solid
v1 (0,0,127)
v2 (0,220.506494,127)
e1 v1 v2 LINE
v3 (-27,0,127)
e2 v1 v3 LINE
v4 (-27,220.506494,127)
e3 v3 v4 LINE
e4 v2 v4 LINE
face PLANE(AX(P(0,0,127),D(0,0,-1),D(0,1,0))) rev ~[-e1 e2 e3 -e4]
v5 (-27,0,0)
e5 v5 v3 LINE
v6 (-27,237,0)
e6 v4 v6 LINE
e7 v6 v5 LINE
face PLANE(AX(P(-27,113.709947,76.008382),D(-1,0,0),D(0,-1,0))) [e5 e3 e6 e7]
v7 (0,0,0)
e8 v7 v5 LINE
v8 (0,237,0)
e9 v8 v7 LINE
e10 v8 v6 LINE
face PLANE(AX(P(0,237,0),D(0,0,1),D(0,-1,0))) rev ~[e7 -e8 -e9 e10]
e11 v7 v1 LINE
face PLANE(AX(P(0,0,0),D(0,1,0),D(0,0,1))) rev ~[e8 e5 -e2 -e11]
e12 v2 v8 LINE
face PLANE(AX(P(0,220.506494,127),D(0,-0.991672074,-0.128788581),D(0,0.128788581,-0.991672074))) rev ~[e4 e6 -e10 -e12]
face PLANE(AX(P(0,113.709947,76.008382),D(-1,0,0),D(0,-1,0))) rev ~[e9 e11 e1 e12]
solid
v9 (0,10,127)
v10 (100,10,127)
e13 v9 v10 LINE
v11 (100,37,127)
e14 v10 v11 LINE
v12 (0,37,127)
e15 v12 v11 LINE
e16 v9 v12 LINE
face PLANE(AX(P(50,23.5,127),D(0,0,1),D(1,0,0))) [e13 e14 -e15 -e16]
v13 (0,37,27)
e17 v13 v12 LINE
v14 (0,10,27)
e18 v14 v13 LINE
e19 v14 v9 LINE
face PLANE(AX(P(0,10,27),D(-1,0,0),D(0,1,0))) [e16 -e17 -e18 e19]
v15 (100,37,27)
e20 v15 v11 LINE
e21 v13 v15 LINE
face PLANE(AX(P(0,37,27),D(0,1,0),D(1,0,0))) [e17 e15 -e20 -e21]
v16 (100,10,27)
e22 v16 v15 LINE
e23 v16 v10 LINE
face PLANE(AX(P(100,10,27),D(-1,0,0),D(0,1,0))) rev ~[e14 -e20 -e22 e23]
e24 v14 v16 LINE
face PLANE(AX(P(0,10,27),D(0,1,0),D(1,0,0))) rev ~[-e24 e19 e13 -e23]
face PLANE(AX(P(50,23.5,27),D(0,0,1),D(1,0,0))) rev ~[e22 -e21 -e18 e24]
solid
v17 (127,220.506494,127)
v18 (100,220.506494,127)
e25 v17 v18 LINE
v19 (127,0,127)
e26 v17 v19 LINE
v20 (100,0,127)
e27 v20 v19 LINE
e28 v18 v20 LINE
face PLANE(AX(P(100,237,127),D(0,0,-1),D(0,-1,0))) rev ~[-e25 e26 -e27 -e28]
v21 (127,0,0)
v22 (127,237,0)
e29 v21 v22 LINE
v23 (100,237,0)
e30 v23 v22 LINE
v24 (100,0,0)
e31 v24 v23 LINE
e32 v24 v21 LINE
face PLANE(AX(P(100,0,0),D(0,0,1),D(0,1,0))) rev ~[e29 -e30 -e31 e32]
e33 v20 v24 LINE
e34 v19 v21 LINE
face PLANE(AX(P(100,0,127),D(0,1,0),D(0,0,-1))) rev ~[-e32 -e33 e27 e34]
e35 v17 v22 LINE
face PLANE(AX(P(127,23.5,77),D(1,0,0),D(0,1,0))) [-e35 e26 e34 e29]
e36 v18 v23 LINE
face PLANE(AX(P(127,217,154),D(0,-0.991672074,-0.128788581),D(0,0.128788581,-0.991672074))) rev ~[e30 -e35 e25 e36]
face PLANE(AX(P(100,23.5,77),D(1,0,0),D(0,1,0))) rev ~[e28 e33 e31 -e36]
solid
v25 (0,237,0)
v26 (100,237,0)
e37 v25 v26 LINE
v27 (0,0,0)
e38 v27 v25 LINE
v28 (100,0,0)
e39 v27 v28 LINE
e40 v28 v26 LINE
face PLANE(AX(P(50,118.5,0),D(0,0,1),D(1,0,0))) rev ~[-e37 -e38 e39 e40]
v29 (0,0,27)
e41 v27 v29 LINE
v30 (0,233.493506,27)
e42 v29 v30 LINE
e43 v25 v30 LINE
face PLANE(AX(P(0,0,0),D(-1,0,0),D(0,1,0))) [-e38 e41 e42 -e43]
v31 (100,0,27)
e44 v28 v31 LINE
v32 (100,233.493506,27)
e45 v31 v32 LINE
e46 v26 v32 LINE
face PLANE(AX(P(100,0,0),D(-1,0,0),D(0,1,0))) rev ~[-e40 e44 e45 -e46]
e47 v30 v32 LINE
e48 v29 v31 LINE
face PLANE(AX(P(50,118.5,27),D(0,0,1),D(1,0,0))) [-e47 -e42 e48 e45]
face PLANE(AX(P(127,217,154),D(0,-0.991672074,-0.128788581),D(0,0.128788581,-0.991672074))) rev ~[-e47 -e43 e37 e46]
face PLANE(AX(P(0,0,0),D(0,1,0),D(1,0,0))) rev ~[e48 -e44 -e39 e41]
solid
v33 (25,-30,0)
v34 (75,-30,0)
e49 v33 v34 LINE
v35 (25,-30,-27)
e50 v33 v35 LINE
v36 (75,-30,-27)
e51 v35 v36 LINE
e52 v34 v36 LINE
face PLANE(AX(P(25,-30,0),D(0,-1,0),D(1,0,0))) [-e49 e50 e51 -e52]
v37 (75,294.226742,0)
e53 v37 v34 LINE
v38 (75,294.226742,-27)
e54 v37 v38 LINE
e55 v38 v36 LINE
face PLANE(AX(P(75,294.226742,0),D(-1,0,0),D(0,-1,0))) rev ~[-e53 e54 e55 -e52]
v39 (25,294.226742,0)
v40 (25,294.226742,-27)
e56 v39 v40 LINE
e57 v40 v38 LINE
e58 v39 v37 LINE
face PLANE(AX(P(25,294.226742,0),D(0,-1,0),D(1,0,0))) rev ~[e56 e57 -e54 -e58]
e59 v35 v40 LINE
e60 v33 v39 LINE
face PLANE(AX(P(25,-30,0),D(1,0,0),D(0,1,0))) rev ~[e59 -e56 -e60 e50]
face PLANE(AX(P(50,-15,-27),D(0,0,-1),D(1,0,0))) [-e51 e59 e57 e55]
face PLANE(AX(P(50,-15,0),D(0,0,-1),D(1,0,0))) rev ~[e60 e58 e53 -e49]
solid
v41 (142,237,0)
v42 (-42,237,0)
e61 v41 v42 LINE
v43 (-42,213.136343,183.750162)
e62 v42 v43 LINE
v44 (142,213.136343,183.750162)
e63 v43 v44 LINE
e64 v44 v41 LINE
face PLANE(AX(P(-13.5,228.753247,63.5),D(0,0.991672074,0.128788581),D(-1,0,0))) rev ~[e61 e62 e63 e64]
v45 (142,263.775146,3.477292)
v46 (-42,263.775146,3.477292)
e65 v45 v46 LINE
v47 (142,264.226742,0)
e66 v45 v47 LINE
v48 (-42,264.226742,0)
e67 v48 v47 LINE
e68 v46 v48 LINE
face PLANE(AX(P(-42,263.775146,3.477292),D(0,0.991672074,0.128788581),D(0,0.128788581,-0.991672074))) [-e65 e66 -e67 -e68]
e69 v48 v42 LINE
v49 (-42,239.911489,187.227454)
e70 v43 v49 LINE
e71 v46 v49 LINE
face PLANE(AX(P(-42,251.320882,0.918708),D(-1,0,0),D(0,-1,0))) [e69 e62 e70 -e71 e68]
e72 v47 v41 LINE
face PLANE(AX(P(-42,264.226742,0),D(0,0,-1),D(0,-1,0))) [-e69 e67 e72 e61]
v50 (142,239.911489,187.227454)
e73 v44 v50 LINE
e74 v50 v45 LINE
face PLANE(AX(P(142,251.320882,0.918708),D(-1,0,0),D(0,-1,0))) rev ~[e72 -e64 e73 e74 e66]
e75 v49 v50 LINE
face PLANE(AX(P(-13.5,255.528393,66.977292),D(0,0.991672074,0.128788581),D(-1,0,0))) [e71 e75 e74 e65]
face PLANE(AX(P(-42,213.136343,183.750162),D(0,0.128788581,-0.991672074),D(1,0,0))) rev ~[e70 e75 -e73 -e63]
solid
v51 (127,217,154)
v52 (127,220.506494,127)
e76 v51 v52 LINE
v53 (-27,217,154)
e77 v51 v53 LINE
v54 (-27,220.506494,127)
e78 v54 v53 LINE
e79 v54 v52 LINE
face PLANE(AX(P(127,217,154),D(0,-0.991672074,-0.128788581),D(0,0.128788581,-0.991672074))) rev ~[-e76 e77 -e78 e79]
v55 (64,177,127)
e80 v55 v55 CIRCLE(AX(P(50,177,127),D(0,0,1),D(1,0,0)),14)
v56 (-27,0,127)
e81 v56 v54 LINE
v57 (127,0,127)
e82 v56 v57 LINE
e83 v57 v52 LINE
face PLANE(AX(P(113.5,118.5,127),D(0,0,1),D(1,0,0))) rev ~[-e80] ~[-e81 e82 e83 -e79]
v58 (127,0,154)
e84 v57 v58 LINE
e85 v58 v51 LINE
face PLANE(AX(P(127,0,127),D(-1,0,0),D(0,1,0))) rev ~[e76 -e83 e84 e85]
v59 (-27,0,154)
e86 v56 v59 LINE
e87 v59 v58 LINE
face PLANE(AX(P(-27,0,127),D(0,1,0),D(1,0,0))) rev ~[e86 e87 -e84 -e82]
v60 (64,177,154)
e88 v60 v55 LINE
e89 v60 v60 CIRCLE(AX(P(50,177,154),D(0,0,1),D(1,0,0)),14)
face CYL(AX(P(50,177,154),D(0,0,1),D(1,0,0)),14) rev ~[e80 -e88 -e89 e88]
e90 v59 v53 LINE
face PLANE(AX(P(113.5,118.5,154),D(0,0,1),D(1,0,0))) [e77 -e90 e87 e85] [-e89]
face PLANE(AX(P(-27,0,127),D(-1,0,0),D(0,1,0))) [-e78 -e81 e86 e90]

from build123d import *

# Parameters (mm, degrees)
F0_W      = 100
F0_H      = 237
F1_DEPTH  = 27
F2_W      = 100
F2_H      = 27
F3_DEPTH  = 100
F4_W      = 27
F4_H      = 100
F4_W_2    = 200
F4_W_3    = 10
F5_DEPTH  = 27
F6_W      = 27
F6_H      = 237
F6_W_2    = 127
F7_DEPTH  = 27
F8_R      = 14
F9_DEPTH  = 27
F11_DEPTH = 154.001
F13_DEPTH = 27
F14_W     = 100
F14_H     = 27.2267423081
F14_H_2   = 100.8397863263
F15_DEPTH = 27
F17_DEPTH = 184
F18_W     = 50
F18_H     = 30
F18_H_2   = 237
F18_H_3   = 27.2267423081
F19_DEPTH = 27


with BuildPart() as f1:
    # F0 (on Top) → F1 (new body)
    with BuildSketch(Plane.XY):
        with Locations((50, 118.5)):
            Rectangle(F0_W, F0_H)
    extrude(amount=F1_DEPTH)


with BuildPart() as f3:
    # F2 (on face) → F3 (new body)
    with BuildSketch(Plane.XY.offset(27)):
        with Locations((50, 23.5)):
            Rectangle(F2_W, F2_H)
    extrude(amount=F3_DEPTH)


with BuildPart() as f5:
    # F4 (on face) → F5 (new body)
    with BuildSketch(Plane.YZ.offset(100)):
        with Locations((23.5, 77)):
            Rectangle(F4_W, F4_H)
        with Locations((137, 77)):
            Rectangle(F4_W_2, F4_H)
        Polygon((0, 27), (0, 0), (237, 0), (237, 27), (37, 27), (10, 27), align=None)
        with Locations((5, 77)):
            Rectangle(F4_W_3, F4_H)
    extrude(amount=F5_DEPTH)


with BuildPart() as f7:
    # F6 (on face) → F7 (new body)
    with BuildSketch(Plane.XY.offset(127)):
        with Locations((113.5, 118.5)):
            Rectangle(F6_W, F6_H)
        with Locations((36.5, 118.5)):
            Rectangle(F6_W_2, F6_H)
    extrude(amount=F7_DEPTH)

    # F8 (on face) → F9 (cut, through all)
    with BuildSketch(Plane.XY.offset(154)):
        with Locations((50, 177)):
            Circle(F8_R)
    extrude(amount=-F9_DEPTH, mode=Mode.SUBTRACT)


with BuildPart() as f11_tool:
    # F10 (on face) → F11 (new body, through all)
    with BuildSketch(Plane.YZ.offset(127)):
        Polygon((237, 127), (220.5064935065, 127), (237, 0), align=None)
        Polygon((217, 154), (220.5064935065, 127), (237, 127), (237, 154), align=None)
    extrude(amount=-F11_DEPTH)


with BuildPart() as f1_1:
    add(f1.part)

    # F11: cut by f11_tool
    add(f11_tool.part, mode=Mode.SUBTRACT)


with BuildPart() as f5_1:
    add(f5.part)

    # F11: cut by f11_tool
    add(f11_tool.part, mode=Mode.SUBTRACT)


with BuildPart() as f7_1:
    add(f7.part)

    # F11: cut by f11_tool
    add(f11_tool.part, mode=Mode.SUBTRACT)


with BuildPart() as f13:
    # F12 (on face) → F13 (new body)
    with BuildSketch(Plane(origin=(0, 0, 0), x_dir=(0, -1, 0), z_dir=(-1, 0, 0))):
        Polygon((0, 127), (-220.5064935065, 127), (-233.4935064935, 27), (0, 27), align=None)
        Polygon((0, 27), (-233.4935064935, 27), (-237, 0), (0, 0), align=None)
    extrude(amount=F13_DEPTH)


with BuildPart() as f15:
    # F14 (on face) → F15 (new body)
    with BuildSketch(Plane(origin=(0, 233.0689998341, 30.2687012772), x_dir=(-1, 0, 0), z_dir=(0, 0.9916720735, 0.128788581))):
        Polygon((27, -30.5228936916), (27, 97.5436349427), (0, 97.5436349427), (0, -3.2961513835), (0, -30.5228936916), align=None)
        Polygon((27, 124.7703772508), (27, 97.5436349427), (27, -30.5228936916), (42, -30.5228936916), (42, 154.7703772508), (-142, 154.7703772508), (-142, -30.5228936916), (-127, -30.5228936916), (-127, 97.5436349427), (-127, 124.7703772508), align=None)
        Polygon((-100, -3.2961513835), (-100, 97.5436349427), (-127, 97.5436349427), (-127, -30.5228936916), (-100, -30.5228936916), align=None)
        with Locations((-50, -16.9095225376)):
            Rectangle(F14_W, F14_H)
        Polygon((0, 97.5436349427), (27, 97.5436349427), (27, 124.7703772508), (-127, 124.7703772508), (-127, 97.5436349427), (-100, 97.5436349427), align=None)
        with Locations((-50, 47.1237417796)):
            Rectangle(F14_W, F14_H_2)
    extrude(amount=F15_DEPTH)

    # F16 (on face) → F17 (join, through all)
    with BuildSketch(Plane(origin=(-42, 0, 0), x_dir=(0, -1, 0), z_dir=(-1, 0, 0))):
        Polygon((-264.2267423081, 0), (-237, 0), (-263.7751459852, 3.4772916864), align=None)
    extrude(amount=-F17_DEPTH)


with BuildPart() as f19:
    # F18 (on face) → F19 (new body)
    with BuildSketch(Plane(origin=(0, 0, 0), x_dir=(1, 0, 0), z_dir=(0, 0, -1))):
        with Locations((50, 15)):
            Rectangle(F18_W, F18_H)
        with Locations((50, -118.5)):
            Rectangle(F18_W, F18_H_2)
        with Locations((50, -250.613371154)):
            Rectangle(F18_W, F18_H_3)
        with Locations((50, -279.2267423081)):
            Rectangle(F18_W, F18_H)
    extrude(amount=F19_DEPTH)


solid = Compound([f3.part, f1_1.part, f5_1.part, f7_1.part, f13.part, f15.part, f19.part])
